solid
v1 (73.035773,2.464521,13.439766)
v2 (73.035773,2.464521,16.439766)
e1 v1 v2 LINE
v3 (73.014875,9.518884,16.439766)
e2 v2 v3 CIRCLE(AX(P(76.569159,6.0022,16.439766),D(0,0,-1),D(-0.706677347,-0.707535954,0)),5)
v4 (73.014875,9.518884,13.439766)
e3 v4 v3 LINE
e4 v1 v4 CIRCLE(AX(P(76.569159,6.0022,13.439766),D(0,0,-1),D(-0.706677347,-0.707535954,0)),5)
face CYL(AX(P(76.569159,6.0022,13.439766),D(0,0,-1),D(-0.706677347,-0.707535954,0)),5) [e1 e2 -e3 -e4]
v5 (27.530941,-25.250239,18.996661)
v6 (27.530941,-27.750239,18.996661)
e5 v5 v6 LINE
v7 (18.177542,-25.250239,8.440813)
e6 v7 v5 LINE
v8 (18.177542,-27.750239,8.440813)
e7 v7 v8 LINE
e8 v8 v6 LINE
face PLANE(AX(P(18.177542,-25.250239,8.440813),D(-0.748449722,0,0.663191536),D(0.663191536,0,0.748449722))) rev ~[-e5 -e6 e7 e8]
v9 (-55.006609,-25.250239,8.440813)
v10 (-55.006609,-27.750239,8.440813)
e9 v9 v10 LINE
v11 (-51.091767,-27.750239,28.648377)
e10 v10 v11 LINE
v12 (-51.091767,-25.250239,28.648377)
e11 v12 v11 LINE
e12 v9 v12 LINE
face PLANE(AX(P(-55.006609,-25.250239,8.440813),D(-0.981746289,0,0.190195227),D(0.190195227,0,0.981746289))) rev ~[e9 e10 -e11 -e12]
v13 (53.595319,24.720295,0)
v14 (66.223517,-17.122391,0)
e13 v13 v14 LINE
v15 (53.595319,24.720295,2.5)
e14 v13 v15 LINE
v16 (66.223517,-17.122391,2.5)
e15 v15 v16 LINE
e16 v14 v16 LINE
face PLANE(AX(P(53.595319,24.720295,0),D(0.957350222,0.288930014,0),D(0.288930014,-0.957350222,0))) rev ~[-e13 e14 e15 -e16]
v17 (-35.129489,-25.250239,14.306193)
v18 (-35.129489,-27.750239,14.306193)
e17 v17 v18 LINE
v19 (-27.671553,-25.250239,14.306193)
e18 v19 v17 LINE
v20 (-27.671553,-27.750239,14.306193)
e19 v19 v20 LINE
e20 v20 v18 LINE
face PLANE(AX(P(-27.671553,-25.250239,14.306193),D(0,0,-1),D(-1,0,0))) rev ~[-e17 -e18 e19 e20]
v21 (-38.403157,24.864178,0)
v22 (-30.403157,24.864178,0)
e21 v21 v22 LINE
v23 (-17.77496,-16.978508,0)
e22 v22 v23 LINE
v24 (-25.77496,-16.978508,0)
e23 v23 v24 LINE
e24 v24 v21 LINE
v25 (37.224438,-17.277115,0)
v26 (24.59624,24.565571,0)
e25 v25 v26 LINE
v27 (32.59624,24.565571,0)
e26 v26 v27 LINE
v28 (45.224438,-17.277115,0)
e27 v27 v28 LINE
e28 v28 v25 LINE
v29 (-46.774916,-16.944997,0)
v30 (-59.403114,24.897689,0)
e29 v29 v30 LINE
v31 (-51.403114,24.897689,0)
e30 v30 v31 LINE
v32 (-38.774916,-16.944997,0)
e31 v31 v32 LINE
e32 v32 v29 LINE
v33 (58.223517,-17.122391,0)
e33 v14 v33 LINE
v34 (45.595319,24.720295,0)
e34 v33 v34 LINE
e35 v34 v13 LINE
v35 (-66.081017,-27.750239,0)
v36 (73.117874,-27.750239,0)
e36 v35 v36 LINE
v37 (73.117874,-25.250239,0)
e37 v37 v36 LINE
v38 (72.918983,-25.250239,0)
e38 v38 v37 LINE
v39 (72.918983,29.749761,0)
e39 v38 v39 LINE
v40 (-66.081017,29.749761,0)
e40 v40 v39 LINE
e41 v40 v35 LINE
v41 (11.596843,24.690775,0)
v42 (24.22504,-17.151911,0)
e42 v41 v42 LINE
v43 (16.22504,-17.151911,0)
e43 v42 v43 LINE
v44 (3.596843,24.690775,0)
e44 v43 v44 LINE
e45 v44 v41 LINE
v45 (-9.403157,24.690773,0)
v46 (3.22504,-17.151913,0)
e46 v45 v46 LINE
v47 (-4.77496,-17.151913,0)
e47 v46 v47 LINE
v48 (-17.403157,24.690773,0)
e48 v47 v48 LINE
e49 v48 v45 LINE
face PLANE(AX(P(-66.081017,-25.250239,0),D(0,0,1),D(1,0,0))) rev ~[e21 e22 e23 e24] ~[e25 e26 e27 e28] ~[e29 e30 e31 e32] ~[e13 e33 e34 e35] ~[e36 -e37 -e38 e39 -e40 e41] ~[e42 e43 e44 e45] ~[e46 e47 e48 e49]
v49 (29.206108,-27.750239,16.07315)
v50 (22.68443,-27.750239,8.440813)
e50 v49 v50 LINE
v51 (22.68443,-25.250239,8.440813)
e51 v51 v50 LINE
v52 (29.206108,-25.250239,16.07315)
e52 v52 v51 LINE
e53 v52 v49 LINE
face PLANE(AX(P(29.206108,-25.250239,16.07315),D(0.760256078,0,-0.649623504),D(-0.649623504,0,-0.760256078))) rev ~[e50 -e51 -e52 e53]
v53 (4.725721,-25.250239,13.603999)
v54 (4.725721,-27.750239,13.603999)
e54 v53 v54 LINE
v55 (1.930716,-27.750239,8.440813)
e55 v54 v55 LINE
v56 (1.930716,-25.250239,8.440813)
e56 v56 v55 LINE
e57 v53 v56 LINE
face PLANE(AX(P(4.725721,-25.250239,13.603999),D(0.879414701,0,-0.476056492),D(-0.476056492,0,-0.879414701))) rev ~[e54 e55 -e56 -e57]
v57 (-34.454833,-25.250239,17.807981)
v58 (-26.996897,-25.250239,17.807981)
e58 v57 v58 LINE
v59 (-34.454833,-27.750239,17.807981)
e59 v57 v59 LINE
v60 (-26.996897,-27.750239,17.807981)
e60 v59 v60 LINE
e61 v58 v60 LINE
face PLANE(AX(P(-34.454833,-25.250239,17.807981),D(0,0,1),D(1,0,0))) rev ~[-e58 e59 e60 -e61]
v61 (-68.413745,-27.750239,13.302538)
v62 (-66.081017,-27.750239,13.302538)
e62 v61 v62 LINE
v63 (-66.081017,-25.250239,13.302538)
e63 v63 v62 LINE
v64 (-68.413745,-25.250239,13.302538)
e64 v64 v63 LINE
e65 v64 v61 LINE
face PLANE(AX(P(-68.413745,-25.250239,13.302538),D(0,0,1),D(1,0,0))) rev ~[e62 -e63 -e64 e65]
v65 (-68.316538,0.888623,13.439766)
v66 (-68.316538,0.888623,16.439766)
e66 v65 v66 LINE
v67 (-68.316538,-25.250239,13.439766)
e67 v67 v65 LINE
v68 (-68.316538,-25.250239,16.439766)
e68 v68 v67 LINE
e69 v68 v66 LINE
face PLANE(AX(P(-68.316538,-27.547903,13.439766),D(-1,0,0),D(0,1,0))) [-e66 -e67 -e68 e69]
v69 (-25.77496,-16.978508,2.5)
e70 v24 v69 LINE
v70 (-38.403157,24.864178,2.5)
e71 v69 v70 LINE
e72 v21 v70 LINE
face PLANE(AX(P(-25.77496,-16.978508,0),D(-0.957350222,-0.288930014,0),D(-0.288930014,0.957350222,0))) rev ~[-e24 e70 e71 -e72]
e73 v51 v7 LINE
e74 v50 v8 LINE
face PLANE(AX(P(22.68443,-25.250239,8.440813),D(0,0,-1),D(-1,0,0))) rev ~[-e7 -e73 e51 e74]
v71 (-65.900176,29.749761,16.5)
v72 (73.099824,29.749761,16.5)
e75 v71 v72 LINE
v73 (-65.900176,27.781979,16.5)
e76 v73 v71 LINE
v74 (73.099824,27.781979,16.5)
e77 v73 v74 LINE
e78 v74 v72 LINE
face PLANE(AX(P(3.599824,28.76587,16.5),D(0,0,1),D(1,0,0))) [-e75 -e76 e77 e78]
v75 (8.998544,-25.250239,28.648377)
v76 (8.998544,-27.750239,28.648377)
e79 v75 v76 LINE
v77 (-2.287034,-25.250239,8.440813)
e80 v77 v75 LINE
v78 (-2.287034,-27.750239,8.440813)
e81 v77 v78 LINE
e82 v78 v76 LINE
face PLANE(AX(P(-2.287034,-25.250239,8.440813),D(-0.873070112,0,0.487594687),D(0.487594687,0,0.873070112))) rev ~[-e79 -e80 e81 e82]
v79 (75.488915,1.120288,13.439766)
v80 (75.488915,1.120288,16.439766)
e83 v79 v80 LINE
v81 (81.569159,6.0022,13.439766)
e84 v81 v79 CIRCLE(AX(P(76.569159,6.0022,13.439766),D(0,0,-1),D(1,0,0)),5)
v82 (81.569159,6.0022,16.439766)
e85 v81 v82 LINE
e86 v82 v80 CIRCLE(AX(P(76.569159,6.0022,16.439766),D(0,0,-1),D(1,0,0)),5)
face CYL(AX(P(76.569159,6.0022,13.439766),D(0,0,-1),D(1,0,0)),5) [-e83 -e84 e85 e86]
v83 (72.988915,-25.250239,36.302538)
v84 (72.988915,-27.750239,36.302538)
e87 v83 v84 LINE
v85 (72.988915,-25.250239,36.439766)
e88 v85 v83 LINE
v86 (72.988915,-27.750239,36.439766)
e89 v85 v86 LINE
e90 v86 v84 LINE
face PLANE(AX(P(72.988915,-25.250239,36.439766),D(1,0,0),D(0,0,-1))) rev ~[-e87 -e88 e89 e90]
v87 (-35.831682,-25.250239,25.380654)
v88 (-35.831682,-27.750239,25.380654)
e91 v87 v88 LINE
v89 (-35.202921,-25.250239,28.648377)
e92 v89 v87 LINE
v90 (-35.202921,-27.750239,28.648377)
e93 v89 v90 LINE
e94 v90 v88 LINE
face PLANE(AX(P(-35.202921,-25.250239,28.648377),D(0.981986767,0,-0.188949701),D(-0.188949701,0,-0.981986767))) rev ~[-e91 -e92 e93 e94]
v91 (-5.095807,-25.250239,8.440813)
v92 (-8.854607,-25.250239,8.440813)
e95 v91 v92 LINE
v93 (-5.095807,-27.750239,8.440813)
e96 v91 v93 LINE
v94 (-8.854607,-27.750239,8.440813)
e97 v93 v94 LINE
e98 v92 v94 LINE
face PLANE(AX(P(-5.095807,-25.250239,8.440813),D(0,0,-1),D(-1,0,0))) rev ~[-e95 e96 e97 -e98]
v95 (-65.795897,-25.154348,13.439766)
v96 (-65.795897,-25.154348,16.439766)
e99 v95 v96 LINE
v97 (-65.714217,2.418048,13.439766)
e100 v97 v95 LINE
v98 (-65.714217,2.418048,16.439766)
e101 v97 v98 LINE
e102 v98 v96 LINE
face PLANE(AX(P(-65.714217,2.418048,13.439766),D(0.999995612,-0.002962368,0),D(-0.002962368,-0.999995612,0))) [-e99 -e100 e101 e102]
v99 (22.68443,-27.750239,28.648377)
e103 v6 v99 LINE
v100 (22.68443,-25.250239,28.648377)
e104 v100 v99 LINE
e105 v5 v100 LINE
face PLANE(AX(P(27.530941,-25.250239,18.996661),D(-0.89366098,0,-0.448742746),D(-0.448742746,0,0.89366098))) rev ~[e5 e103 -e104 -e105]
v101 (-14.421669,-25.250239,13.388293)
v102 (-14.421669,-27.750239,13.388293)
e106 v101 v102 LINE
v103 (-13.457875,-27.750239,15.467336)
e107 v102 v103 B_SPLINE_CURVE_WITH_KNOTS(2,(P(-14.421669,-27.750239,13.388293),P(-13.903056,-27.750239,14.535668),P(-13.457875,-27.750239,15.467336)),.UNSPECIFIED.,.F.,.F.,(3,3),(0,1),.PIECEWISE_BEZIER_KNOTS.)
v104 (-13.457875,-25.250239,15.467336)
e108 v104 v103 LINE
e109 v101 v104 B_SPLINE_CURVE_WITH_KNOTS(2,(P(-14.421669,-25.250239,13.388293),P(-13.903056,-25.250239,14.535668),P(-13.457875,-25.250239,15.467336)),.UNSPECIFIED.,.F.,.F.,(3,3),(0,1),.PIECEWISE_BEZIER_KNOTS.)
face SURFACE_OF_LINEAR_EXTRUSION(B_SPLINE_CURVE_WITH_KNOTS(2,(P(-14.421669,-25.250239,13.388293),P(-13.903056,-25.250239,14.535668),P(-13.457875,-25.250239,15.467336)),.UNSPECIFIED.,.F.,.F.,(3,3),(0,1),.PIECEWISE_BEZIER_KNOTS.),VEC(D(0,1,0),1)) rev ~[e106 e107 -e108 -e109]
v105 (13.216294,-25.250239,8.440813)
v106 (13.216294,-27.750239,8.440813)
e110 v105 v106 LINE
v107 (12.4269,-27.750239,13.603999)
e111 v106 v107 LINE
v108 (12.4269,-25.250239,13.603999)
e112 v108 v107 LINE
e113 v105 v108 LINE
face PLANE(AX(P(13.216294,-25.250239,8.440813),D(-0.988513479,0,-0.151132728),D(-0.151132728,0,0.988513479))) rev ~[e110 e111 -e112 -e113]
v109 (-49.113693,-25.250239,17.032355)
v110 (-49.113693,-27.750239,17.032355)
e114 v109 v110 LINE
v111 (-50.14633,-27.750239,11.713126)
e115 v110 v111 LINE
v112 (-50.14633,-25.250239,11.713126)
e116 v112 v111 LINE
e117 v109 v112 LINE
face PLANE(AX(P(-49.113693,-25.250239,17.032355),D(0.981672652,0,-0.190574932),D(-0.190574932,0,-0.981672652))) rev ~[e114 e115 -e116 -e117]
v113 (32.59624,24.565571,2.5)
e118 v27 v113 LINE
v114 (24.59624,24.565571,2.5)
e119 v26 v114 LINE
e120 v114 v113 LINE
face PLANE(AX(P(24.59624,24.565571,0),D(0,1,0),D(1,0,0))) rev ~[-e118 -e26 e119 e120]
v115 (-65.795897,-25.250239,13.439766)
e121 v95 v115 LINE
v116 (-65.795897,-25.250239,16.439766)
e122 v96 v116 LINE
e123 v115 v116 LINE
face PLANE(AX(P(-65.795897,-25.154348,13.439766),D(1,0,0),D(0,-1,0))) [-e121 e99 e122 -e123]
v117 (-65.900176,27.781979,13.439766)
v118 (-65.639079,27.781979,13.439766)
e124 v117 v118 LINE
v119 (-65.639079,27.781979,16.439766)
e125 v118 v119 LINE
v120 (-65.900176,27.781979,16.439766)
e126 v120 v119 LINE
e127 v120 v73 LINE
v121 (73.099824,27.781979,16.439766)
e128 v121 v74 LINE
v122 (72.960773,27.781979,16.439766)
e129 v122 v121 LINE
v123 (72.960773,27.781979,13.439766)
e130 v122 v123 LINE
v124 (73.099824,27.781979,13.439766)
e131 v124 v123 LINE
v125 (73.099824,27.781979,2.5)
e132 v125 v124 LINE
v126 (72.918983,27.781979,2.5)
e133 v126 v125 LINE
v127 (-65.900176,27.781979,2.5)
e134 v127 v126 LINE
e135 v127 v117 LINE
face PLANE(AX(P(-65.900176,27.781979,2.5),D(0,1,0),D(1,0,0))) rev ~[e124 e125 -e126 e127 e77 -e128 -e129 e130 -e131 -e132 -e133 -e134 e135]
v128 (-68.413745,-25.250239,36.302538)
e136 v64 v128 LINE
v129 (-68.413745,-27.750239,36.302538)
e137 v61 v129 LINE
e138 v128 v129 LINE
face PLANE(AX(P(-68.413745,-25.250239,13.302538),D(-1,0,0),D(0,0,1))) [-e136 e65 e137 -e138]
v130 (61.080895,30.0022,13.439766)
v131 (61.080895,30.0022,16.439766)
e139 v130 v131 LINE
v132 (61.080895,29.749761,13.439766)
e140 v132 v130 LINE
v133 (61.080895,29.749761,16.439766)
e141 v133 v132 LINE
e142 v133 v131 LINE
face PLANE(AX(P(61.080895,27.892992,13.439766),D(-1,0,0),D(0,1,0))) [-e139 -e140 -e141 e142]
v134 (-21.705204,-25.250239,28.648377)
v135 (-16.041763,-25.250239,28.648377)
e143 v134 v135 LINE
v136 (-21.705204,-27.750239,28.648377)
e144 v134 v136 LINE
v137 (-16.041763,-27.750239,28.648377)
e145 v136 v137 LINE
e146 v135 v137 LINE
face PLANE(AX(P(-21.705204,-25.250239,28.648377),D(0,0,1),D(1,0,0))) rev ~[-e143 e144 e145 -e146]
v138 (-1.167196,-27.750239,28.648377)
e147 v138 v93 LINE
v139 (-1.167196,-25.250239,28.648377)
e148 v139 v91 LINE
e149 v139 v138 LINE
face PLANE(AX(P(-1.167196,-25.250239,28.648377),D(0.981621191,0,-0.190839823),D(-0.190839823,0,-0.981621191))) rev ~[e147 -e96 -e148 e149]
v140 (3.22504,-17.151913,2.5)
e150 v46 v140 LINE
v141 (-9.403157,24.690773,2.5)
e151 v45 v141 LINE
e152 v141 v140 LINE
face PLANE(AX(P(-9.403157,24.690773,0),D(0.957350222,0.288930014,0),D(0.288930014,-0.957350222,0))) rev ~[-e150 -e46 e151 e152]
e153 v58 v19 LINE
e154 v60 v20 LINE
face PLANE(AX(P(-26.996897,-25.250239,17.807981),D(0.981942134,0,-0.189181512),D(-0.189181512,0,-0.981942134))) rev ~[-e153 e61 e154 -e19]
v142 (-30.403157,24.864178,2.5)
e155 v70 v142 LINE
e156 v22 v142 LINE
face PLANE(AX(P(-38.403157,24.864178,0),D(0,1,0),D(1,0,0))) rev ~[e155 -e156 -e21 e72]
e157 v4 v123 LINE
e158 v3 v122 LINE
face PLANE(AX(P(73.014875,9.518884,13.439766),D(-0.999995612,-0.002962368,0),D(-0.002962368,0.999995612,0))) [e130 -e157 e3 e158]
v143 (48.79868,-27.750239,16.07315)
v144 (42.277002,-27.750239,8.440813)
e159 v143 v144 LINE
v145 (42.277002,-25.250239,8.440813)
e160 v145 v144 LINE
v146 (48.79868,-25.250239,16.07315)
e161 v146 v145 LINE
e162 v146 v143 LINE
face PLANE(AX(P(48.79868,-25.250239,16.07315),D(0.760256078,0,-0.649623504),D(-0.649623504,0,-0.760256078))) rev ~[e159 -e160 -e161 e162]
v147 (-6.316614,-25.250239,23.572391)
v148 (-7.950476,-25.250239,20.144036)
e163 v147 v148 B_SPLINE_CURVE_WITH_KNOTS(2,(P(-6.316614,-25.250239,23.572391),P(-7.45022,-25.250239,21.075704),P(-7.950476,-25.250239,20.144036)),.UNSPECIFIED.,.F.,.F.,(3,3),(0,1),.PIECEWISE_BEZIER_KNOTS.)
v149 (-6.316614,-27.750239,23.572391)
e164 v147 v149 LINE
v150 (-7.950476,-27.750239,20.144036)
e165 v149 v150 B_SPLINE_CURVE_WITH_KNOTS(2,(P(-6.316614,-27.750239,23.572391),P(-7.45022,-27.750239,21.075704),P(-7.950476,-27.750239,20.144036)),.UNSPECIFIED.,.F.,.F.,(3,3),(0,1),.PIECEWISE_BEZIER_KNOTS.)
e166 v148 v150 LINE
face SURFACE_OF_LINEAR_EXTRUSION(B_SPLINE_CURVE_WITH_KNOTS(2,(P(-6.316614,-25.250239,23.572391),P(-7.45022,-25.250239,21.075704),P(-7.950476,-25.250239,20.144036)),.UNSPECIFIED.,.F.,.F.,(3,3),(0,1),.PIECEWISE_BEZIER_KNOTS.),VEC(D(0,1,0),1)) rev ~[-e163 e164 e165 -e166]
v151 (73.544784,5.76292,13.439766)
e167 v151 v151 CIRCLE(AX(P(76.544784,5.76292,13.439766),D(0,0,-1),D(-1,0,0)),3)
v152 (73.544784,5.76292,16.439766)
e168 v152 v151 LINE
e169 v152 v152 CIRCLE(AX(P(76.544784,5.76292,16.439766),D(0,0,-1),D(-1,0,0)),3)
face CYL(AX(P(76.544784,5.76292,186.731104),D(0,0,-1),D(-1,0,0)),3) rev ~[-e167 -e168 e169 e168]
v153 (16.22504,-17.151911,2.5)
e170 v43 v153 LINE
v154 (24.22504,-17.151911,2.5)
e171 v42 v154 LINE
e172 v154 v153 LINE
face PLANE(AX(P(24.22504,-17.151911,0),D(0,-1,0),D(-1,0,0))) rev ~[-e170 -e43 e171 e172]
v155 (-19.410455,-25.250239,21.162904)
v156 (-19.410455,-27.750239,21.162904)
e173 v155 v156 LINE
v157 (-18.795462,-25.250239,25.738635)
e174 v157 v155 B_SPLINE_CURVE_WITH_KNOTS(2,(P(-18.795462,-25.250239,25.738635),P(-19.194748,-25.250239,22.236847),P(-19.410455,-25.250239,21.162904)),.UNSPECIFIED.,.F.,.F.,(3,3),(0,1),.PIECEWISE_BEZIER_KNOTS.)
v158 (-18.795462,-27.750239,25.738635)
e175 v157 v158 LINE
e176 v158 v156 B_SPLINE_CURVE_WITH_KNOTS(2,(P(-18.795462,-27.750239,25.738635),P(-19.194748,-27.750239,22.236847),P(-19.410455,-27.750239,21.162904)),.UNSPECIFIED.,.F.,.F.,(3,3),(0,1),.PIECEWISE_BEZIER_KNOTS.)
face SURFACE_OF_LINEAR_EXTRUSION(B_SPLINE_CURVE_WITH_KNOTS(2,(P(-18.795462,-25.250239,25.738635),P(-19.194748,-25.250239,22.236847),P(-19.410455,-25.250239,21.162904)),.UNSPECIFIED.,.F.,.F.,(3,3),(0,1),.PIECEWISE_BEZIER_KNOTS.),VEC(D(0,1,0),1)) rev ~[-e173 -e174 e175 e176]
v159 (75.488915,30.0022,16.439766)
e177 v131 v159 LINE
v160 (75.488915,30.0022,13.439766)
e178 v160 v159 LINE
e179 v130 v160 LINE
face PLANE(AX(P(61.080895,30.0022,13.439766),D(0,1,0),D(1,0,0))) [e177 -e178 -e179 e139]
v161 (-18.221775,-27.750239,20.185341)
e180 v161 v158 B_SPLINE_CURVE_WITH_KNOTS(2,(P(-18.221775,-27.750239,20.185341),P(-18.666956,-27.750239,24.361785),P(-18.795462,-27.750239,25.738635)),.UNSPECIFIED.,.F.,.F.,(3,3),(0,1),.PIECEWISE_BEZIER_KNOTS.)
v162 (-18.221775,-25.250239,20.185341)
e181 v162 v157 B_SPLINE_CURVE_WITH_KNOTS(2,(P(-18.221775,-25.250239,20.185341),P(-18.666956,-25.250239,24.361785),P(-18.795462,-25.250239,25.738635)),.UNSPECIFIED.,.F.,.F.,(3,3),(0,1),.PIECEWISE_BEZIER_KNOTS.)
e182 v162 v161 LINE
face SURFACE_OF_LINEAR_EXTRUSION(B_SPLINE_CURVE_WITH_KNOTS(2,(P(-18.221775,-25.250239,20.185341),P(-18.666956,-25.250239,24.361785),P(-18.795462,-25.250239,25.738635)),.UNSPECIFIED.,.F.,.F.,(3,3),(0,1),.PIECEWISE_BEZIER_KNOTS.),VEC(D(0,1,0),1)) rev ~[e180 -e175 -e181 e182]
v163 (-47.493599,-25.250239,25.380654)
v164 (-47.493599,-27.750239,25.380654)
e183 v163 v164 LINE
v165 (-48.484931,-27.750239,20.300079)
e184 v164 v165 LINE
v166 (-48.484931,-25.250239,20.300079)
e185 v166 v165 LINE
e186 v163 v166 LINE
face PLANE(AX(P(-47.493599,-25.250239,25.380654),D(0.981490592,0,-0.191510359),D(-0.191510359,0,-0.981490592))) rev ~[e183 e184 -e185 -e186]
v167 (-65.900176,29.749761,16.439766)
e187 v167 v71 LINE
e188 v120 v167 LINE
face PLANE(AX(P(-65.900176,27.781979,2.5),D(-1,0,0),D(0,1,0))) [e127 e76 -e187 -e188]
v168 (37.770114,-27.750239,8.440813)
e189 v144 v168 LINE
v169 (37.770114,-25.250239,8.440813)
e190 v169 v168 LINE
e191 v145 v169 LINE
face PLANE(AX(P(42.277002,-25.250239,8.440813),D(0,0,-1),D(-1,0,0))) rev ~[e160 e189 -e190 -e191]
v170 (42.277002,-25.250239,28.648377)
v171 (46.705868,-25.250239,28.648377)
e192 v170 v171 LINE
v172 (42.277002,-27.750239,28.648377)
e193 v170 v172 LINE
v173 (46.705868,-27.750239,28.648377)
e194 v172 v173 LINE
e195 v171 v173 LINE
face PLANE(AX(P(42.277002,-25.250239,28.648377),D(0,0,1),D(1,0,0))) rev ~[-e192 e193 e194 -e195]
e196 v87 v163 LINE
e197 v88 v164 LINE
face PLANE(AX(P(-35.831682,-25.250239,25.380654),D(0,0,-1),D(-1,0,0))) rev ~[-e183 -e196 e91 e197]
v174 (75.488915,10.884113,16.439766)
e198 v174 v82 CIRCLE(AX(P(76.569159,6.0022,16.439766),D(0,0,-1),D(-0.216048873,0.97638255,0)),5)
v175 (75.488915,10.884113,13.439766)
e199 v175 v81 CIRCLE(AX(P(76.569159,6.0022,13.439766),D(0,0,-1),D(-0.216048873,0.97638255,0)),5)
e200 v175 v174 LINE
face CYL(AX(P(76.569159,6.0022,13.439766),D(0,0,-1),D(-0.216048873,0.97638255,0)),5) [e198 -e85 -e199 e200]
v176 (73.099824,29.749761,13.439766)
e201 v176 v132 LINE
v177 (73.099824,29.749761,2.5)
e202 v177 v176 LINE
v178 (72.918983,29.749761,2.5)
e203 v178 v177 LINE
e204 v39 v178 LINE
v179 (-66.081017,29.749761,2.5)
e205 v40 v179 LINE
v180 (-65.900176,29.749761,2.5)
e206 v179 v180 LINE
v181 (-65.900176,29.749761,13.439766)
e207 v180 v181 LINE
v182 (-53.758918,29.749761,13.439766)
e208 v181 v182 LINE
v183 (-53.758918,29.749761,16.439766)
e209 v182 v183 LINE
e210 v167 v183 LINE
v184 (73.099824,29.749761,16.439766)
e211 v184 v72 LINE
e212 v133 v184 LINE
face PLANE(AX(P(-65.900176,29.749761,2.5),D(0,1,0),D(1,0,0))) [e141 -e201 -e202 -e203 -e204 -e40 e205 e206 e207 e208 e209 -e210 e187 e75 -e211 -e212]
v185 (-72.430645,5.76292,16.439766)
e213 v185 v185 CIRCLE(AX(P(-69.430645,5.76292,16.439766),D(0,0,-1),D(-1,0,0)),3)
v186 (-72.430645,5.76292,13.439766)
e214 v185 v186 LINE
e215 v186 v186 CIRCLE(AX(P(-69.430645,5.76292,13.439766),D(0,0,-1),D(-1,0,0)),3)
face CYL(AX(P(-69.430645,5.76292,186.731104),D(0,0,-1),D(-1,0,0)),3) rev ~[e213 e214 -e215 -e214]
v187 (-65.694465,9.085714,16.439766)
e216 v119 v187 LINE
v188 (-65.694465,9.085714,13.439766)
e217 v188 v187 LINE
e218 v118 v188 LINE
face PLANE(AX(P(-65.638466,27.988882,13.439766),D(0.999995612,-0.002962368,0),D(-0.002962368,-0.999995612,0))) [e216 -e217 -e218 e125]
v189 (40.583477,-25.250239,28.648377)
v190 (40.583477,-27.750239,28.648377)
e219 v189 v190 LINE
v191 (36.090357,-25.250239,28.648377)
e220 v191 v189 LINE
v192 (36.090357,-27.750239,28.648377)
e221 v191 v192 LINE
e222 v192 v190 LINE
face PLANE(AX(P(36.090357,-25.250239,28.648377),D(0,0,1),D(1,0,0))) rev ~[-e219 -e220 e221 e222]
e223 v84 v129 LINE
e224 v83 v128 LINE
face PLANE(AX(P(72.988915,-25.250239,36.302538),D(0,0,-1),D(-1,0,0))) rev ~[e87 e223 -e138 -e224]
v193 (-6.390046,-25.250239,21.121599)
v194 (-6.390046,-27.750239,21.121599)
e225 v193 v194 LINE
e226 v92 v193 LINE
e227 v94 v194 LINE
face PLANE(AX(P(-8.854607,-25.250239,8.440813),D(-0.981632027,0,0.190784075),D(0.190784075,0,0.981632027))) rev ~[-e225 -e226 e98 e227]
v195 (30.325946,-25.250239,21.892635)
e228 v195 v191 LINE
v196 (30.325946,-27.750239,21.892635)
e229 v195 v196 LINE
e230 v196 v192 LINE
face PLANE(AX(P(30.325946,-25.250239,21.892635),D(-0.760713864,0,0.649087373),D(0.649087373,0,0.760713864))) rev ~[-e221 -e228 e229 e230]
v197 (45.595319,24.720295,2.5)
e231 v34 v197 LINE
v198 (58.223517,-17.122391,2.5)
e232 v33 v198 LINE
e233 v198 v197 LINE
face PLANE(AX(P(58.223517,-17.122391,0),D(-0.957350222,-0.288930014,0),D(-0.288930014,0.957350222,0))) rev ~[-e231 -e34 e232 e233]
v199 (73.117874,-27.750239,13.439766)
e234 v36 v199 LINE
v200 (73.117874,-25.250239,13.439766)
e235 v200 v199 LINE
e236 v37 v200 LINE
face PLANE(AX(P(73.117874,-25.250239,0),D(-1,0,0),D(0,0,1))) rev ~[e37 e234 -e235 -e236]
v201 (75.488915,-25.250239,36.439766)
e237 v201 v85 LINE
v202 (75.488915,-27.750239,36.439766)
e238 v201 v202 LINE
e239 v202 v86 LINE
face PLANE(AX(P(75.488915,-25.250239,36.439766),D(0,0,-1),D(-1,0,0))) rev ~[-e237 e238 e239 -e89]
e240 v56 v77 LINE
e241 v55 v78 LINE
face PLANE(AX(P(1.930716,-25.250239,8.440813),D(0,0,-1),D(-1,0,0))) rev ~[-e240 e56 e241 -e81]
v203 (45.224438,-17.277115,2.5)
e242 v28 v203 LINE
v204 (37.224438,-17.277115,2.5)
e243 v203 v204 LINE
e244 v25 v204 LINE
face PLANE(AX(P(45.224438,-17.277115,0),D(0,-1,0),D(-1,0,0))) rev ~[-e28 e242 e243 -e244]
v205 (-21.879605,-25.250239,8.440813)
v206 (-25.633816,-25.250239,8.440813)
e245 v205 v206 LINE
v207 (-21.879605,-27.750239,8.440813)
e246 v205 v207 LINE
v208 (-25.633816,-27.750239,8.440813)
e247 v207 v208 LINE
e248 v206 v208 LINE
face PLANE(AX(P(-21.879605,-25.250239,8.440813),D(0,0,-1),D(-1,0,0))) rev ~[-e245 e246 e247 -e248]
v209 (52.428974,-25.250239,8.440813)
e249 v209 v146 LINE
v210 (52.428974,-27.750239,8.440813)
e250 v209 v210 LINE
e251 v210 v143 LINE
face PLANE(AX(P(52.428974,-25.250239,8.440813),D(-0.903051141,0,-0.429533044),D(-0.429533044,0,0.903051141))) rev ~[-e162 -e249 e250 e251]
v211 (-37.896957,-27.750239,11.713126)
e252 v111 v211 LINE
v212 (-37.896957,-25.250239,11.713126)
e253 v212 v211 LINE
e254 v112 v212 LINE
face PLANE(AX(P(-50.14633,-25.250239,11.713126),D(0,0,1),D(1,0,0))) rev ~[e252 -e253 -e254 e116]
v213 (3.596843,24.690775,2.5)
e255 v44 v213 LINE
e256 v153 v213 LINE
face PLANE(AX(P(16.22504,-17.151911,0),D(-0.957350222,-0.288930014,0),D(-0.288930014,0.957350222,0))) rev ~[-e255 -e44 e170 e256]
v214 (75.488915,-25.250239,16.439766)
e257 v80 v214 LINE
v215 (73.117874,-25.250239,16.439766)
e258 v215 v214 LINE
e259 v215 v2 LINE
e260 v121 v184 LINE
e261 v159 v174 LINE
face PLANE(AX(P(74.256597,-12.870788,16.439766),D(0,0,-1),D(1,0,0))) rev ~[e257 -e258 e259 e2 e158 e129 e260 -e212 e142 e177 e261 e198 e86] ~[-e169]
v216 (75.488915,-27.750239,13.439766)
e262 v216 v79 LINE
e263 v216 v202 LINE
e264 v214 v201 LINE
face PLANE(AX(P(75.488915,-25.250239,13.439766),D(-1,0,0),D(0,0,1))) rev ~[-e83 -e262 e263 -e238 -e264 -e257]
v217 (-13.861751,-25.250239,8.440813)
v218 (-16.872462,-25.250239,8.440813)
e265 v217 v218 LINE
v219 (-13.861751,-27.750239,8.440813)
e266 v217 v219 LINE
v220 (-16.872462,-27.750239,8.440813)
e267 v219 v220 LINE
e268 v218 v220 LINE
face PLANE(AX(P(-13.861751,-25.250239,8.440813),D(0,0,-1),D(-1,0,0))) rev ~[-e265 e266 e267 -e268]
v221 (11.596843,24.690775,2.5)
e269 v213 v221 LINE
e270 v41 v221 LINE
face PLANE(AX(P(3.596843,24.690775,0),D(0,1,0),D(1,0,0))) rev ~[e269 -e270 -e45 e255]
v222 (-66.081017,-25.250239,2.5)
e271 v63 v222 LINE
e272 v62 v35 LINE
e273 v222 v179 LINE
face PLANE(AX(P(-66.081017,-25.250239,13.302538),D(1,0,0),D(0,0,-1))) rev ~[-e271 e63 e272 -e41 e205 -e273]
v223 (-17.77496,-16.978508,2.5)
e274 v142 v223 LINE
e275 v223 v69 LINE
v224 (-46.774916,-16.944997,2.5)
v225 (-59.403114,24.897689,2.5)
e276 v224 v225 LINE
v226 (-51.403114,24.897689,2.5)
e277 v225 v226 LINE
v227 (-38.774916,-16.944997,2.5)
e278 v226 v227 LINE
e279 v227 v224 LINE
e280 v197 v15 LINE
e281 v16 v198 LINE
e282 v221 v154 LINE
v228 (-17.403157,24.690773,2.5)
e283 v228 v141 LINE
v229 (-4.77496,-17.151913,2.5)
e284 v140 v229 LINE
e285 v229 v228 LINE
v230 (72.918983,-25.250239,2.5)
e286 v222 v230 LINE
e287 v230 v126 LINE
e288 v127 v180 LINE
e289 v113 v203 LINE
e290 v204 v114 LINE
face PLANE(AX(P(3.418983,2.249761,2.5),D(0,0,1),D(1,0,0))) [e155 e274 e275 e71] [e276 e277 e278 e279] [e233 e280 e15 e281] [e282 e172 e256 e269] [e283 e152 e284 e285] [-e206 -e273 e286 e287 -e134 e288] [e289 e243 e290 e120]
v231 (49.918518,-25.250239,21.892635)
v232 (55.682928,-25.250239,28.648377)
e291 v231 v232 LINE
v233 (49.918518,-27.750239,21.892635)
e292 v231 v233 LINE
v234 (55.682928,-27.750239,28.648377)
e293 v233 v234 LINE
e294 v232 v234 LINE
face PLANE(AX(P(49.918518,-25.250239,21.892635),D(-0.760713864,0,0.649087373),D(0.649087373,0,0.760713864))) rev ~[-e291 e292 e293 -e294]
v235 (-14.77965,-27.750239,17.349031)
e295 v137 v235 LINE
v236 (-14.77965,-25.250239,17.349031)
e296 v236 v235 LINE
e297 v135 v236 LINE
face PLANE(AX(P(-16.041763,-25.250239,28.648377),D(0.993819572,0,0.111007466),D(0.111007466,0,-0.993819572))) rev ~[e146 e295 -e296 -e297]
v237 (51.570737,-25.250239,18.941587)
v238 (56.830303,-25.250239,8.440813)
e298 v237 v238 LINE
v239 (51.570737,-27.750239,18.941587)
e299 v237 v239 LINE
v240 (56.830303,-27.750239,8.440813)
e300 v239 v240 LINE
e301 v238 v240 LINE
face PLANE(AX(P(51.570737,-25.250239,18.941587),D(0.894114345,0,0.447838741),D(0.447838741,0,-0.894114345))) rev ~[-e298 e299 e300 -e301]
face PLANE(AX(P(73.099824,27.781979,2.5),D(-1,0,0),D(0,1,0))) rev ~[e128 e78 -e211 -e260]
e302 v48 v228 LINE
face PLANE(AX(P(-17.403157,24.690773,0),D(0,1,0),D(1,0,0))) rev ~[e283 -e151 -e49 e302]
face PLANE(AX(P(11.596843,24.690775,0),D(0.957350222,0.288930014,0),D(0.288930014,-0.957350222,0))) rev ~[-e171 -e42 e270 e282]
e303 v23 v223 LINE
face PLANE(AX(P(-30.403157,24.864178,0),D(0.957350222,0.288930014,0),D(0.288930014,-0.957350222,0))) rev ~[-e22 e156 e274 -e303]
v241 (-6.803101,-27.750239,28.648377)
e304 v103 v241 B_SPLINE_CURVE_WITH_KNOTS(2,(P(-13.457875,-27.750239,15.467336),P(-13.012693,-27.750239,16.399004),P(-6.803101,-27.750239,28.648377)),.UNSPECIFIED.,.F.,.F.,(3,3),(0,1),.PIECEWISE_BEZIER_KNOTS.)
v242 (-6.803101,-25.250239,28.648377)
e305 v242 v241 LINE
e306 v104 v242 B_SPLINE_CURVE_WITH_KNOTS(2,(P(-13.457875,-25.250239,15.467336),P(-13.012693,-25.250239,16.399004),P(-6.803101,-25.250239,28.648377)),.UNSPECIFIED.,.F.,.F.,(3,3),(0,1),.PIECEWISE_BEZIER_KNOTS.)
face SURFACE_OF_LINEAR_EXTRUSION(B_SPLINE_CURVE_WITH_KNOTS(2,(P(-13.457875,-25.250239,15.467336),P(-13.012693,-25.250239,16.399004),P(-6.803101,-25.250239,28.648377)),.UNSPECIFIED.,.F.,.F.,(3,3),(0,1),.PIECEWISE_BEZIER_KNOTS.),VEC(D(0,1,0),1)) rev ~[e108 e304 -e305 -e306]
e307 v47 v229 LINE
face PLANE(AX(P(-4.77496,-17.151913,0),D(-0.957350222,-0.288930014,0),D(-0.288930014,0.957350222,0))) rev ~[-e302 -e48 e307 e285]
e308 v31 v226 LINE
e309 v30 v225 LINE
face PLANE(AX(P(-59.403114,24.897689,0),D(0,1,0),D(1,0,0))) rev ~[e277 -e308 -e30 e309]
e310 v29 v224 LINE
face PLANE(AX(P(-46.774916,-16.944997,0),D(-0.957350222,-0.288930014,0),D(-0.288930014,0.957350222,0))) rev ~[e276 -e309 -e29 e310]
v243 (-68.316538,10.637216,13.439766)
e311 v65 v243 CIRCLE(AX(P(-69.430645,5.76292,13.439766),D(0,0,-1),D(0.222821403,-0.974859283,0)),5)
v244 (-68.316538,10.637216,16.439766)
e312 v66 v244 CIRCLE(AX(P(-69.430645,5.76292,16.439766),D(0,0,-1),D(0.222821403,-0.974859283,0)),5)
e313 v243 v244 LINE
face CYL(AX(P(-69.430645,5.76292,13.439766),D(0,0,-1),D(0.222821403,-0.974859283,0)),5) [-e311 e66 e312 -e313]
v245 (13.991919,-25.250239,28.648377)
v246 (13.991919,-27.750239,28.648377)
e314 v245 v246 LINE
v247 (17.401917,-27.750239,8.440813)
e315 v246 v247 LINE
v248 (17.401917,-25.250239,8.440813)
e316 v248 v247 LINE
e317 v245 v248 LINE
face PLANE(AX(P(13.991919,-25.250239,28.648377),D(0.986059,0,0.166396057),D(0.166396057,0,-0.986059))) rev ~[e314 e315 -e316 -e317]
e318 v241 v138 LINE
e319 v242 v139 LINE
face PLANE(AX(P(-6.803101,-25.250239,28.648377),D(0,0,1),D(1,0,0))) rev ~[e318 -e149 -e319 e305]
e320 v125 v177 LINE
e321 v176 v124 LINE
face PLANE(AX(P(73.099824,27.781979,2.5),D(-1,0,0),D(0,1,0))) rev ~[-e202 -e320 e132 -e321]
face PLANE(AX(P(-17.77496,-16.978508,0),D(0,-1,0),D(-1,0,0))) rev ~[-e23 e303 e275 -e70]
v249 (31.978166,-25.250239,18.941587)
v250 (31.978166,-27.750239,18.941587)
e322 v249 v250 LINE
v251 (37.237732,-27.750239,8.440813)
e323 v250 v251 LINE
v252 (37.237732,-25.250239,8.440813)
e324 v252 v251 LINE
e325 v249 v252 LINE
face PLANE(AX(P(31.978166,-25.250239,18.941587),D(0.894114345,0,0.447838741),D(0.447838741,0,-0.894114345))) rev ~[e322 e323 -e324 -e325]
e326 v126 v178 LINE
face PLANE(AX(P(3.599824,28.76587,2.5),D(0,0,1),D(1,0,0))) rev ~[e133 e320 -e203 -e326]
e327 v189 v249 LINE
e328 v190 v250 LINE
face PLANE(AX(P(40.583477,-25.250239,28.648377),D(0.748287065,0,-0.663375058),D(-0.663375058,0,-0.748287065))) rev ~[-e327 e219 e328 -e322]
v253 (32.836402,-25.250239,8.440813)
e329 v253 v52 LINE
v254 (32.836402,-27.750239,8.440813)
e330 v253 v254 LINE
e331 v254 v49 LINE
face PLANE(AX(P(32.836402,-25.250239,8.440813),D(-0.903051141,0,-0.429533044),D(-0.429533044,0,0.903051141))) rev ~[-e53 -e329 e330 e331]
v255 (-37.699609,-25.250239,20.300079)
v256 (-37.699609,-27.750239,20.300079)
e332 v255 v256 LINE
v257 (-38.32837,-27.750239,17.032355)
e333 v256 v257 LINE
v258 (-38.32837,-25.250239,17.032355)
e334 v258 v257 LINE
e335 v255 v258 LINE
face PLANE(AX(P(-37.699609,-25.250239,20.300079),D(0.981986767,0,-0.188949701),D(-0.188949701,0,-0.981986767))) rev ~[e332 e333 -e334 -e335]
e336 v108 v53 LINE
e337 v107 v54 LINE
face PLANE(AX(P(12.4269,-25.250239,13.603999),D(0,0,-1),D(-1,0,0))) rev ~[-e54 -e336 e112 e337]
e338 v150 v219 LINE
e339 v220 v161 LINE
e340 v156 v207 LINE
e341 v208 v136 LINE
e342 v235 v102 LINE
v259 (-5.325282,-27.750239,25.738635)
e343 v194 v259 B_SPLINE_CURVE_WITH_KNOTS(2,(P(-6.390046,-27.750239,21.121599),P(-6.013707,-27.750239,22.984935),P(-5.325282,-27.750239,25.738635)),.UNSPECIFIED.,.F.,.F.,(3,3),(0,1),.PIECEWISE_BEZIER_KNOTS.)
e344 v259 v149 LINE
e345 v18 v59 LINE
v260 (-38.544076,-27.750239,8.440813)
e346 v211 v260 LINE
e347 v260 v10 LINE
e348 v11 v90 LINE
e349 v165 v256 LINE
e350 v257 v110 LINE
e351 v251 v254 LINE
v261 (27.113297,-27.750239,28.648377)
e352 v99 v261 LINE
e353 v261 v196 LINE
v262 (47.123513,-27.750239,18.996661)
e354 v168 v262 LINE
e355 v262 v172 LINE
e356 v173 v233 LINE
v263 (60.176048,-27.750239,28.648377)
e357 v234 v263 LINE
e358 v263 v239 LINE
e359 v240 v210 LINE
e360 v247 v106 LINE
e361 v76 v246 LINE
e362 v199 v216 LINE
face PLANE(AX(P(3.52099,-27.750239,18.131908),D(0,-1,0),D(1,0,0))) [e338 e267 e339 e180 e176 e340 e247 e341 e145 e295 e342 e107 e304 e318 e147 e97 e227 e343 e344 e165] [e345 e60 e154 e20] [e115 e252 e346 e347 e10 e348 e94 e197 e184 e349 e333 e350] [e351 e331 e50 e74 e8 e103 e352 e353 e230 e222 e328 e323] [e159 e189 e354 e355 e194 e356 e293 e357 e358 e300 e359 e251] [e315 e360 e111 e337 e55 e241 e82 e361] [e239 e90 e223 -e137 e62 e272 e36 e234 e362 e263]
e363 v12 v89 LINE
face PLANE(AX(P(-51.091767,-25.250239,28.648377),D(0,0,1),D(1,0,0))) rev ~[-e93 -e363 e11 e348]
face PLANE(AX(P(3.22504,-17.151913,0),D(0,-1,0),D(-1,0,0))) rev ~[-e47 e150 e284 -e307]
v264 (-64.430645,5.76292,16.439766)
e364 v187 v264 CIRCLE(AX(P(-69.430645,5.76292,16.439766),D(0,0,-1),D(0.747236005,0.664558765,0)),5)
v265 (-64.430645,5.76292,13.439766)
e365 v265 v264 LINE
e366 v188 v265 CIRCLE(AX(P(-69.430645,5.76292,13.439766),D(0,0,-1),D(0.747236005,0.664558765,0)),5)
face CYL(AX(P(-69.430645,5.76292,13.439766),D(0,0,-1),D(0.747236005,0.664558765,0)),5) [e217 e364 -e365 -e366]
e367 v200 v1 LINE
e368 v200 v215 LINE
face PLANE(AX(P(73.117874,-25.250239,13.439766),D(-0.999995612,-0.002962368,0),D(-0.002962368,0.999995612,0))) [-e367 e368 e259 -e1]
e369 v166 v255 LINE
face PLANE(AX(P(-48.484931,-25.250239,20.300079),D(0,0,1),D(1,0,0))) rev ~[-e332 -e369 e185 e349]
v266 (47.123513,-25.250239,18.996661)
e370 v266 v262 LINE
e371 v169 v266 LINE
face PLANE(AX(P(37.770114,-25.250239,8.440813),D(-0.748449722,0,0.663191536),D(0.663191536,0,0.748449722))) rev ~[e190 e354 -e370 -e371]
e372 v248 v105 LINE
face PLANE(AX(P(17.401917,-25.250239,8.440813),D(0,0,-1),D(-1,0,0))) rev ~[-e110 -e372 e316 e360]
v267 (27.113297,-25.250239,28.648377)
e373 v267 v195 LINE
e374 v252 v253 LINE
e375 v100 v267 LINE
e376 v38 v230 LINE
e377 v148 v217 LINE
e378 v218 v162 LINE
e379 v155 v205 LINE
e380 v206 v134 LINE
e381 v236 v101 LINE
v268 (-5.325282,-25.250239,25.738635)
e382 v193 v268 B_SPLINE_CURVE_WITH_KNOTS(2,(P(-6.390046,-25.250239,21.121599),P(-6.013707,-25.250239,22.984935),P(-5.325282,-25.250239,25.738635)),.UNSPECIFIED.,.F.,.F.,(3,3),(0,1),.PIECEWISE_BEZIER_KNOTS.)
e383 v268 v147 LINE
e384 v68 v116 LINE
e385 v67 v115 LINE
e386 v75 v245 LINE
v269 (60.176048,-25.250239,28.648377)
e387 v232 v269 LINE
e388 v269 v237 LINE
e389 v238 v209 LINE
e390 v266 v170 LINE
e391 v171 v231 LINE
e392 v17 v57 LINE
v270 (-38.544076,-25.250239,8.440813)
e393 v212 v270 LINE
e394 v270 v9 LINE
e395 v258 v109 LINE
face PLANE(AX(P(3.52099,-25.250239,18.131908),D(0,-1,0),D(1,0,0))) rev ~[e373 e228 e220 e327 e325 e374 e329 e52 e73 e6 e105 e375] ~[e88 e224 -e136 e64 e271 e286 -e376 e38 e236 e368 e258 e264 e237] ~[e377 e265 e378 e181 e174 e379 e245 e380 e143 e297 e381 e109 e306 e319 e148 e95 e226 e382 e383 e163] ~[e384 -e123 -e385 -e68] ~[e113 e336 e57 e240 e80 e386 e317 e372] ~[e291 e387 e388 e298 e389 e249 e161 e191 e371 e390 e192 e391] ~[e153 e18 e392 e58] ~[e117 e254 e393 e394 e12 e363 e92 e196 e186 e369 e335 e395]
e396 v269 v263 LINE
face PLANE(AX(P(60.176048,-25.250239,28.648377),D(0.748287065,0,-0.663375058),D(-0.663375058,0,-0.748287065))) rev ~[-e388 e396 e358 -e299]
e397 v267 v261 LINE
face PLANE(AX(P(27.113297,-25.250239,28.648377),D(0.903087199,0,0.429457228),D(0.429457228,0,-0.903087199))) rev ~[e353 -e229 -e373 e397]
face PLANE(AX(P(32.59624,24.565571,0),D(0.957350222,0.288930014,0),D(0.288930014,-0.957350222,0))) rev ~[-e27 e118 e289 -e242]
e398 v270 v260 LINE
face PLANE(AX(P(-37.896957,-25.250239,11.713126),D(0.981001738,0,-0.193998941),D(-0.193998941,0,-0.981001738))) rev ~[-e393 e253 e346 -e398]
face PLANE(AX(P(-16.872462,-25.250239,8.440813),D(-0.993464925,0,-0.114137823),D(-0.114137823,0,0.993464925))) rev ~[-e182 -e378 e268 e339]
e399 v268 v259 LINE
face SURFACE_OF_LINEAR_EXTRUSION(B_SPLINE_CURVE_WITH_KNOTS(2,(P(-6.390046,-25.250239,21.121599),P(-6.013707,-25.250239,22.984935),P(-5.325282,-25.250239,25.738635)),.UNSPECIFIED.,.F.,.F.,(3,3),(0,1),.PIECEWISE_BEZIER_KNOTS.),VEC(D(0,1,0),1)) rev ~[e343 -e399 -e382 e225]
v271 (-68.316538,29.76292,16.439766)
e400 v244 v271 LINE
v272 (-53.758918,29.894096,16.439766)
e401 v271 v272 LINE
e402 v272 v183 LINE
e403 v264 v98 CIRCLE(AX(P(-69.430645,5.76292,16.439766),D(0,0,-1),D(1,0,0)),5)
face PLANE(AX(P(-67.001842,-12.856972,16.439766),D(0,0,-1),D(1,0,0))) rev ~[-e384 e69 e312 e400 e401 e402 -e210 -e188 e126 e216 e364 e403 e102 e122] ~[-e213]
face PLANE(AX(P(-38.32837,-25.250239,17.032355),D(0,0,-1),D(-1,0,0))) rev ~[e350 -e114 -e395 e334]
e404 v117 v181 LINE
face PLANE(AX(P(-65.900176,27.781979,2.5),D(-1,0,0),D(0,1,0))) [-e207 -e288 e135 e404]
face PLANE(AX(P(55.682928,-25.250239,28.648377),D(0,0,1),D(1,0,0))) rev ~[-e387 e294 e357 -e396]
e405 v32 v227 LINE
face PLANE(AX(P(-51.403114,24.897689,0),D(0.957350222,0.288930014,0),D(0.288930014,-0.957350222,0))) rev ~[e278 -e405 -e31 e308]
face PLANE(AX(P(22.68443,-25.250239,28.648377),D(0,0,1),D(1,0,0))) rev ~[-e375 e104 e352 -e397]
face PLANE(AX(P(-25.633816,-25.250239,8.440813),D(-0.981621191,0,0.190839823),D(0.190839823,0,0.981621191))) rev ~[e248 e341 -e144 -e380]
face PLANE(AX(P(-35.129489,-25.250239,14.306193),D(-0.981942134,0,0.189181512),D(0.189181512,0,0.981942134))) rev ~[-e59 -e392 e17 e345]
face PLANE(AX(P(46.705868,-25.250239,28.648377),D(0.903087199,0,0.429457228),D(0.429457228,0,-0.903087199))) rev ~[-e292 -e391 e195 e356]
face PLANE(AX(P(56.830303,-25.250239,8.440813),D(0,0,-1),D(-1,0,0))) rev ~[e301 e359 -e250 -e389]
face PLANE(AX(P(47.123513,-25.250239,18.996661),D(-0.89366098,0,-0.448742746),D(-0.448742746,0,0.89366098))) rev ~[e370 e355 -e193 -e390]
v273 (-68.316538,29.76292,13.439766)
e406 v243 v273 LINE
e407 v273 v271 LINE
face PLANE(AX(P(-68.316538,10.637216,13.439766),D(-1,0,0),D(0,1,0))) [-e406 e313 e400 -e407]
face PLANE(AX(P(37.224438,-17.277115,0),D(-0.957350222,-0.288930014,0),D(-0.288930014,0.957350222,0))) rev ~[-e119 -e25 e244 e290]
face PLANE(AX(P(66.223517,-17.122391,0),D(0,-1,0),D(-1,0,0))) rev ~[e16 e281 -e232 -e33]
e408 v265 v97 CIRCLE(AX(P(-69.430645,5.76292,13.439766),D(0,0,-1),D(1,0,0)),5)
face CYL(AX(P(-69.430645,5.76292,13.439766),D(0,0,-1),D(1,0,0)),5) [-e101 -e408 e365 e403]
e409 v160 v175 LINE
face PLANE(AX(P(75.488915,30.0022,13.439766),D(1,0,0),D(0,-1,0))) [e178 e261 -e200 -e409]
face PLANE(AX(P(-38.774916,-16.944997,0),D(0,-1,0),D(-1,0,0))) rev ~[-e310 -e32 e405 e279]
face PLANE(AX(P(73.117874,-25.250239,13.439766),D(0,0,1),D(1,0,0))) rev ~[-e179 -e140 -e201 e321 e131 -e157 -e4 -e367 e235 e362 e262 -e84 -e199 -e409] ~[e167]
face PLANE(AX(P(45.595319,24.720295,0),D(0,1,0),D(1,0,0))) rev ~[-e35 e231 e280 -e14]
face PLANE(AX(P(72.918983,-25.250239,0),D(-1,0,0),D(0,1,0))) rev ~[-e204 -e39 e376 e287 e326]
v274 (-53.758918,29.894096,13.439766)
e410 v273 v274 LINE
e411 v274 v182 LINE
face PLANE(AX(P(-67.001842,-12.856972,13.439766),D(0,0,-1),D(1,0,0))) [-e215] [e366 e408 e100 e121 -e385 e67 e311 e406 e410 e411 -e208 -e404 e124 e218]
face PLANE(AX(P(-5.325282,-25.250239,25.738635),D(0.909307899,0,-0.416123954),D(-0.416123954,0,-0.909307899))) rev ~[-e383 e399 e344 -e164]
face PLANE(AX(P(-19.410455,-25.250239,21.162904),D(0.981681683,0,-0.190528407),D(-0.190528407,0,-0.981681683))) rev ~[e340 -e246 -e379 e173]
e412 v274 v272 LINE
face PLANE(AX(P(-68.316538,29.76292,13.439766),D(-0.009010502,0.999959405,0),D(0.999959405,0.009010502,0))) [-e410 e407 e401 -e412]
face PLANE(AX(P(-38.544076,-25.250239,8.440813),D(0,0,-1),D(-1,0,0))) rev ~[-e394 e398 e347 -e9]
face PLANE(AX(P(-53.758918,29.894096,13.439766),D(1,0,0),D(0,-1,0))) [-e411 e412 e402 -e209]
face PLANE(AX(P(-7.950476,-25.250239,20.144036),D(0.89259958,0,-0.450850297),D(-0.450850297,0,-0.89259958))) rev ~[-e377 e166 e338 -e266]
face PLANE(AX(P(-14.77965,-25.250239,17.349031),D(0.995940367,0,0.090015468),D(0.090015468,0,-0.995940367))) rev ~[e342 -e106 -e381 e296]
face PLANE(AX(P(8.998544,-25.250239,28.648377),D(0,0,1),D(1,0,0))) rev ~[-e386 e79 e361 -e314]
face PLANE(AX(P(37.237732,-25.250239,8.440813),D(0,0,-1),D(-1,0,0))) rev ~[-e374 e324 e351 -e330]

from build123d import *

# Parameters (mm, degrees)
F0_W     = 139
F0_H     = 55
F1_DEPTH = 2.5
F2_W     = 2.3327280719
F2_H     = 23
F2_W_2   = 0.1672719281
F2_W_3   = 0.1289593171
F2_H_2   = 22.8627715209
F3_DEPTH = 2.5
F5_DEPTH = 3
F6_W     = 139
F6_H     = 1.9677817641
F7_DEPTH = 14
F9_D     = 6


with BuildPart() as f1:
    # F0 (on Top) → F1 (new body)
    with BuildSketch(Plane.XY):
        with Locations((3.418983344, 2.2497611304)):
            Rectangle(F0_W, F0_H)
        Polygon((-46.7749163508, -16.9449970126), (-59.4031140208, 24.8976889998), (-51.4031140208, 24.8976889998), (-38.7749163508, -16.9449970126), align=None, mode=Mode.SUBTRACT)
        Polygon((-25.7749595437, -16.9785083988), (-38.4031572137, 24.8641776135), (-30.4031572137, 24.8641776135), (-17.7749595437, -16.9785083988), align=None, mode=Mode.SUBTRACT)
        Polygon((-4.7749595437, -17.1519126743), (-17.4031572137, 24.6907733381), (-9.4031572137, 24.6907733381), (3.2250404563, -17.1519126743), align=None, mode=Mode.SUBTRACT)
        Polygon((16.2250404563, -17.1519108117), (3.5968427863, 24.6907752007), (11.5968427863, 24.6907752007), (24.2250404563, -17.1519108117), align=None, mode=Mode.SUBTRACT)
        Polygon((37.2244375112, -17.277115479), (24.5962398412, 24.5655705334), (32.5962398412, 24.5655705334), (45.2244375112, -17.277115479), align=None, mode=Mode.SUBTRACT)
        Polygon((58.2235167211, -17.1223909005), (45.5953190511, 24.7202951119), (53.5953190511, 24.7202951119), (66.2235167211, -17.1223909005), align=None, mode=Mode.SUBTRACT)
    extrude(amount=F1_DEPTH)

    # F2 (on face) → F3 (join)
    with BuildSketch(Plane.XZ.offset(25.2502388696)):
        Polygon((-66.081016656, 13.302537529), (-66.081016656, 0), (73.1178743134, 0), (73.1178743134, 13.4397660082), (72.9889149964, 13.4397660082), (72.9889149964, 36.302537529), (-65.9137447279, 36.302537529), (-65.9137447279, 13.302537529), align=None)
        Polygon((-27.6715531448, 14.3061928175), (-35.129489078, 14.3061928175), (-34.4548327198, 17.8079805818), (-26.9968967865, 17.8079805818), align=None, mode=Mode.SUBTRACT)
        Polygon((-38.5440763607, 8.4408130497), (-55.0066094022, 8.4408130497), (-51.0917667246, 28.6483773044), (-35.2029210626, 28.6483773044), (-35.8316824305, 25.3806539909), (-47.4935994805, 25.3806539909), (-48.4849312723, 20.3000785582), (-37.6996085381, 20.3000785582), (-38.328369906, 17.0323552447), (-49.1136926402, 17.0323552447), (-50.1463299232, 11.7131258622), (-37.8969569966, 11.7131258622), align=None, mode=Mode.SUBTRACT)
        with BuildLine():
            Line((-5.0958073876, 8.4408130497), (-8.8546070979, 8.4408130497))
            Line((-8.8546070979, 8.4408130497), (-6.3900461157, 21.1215988857))
            add(Edge.make_bspline(
                [(-6.3900461157, 21.1215988857), (-6.0137071947, 22.9849354942), (-5.3252823394, 25.7386349157)],
                knots=[0, 0, 0, 1, 1, 1], degree=2))
            Line((-5.3252823394, 25.7386349157), (-6.3166141311, 23.5723913708))
            add(Edge.make_bspline(
                [(-6.3166141311, 23.5723913708), (-7.450220393, 21.0757038953), (-7.9504757879, 20.144035591)],
                knots=[0, 0, 0, 1, 1, 1], degree=2))
            Line((-7.9504757879, 20.144035591), (-13.861750546, 8.4408130497))
            Line((-13.861750546, 8.4408130497), (-16.8724619135, 8.4408130497))
            Line((-16.8724619135, 8.4408130497), (-18.22177463, 20.1853410823))
            add(Edge.make_bspline(
                [(-18.22177463, 20.1853410823), (-18.6669560365, 24.3617852049), (-18.7954620095, 25.7386349157)],
                knots=[0, 0, 0, 1, 1, 1], degree=2))
            add(Edge.make_bspline(
                [(-18.7954620095, 25.7386349157), (-19.1947484256, 22.2368471514), (-19.4104548803, 21.162904377)],
                knots=[0, 0, 0, 1, 1, 1], degree=2))
            Line((-19.4104548803, 21.162904377), (-21.8796053616, 8.4408130497))
            Line((-21.8796053616, 8.4408130497), (-25.6338155729, 8.4408130497))
            Line((-25.6338155729, 8.4408130497), (-21.7052043982, 28.6483773044))
            Line((-21.7052043982, 28.6483773044), (-16.041762588, 28.6483773044))
            Line((-16.041762588, 28.6483773044), (-14.7796503532, 17.3490306782))
            Line((-14.7796503532, 17.3490306782), (-14.4216694284, 13.3882930103))
            add(Edge.make_bspline(
                [(-14.4216694284, 13.3882930103), (-13.9030560373, 14.5356677692), (-13.4578746309, 15.4673360735)],
                knots=[0, 0, 0, 1, 1, 1], degree=2))
            add(Edge.make_bspline(
                [(-13.4578746309, 15.4673360735), (-13.0126932244, 16.3990043778), (-6.8031010289, 28.6483773044)],
                knots=[0, 0, 0, 1, 1, 1], degree=2))
            Line((-6.8031010289, 28.6483773044), (-1.1671962129, 28.6483773044))
            Line((-1.1671962129, 28.6483773044), (-5.0958073876, 8.4408130497))
        make_face(mode=Mode.SUBTRACT)
        Polygon((17.401916886, 8.4408130497), (13.2162937654, 8.4408130497), (12.4268999312, 13.603999465), (4.7257205491, 13.603999465), (1.9307156363, 8.4408130497), (-2.2870339777, 8.4408130497), (8.9985441514, 28.6483773044), (13.9919191024, 28.6483773044), align=None, mode=Mode.SUBTRACT)
        Polygon((27.5309412581, 18.9966608321), (22.6844302763, 28.6483773044), (27.1132968458, 28.6483773044), (30.3259461709, 21.8926347237), (36.0903569599, 28.6483773044), (40.583476516, 28.6483773044), (31.9781658238, 18.9415868436), (37.2377317189, 8.4408130497), (32.8364021435, 8.4408130497), (29.2061084062, 16.0731499462), (22.6844302763, 8.4408130497), (18.1775422231, 8.4408130497), align=None, mode=Mode.SUBTRACT)
        Polygon((47.123512642, 18.9966608321), (42.2770016602, 28.6483773044), (46.7058682298, 28.6483773044), (49.9185175548, 21.8926347237), (55.6829283438, 28.6483773044), (60.1760478999, 28.6483773044), (51.5707372077, 18.9415868436), (56.8303031028, 8.4408130497), (52.4289735274, 8.4408130497), (48.7986797901, 16.0731499462), (42.2770016602, 8.4408130497), (37.770113607, 8.4408130497), align=None, mode=Mode.SUBTRACT)
        with Locations((-67.247380692, 24.802537529)):
            Rectangle(F2_W, F2_H)
        with Locations((-65.997380692, 24.802537529)):
            Rectangle(F2_W_2, F2_H)
        with Locations((73.0533946549, 24.8711517686)):
            Rectangle(F2_W_3, F2_H_2)
        Polygon((73.1178743134, 36.302537529), (73.1178743134, 13.4397660082), (75.4889149964, 13.4397660082), (75.4889149964, 36.4397660082), (72.9889149964, 36.4397660082), (72.9889149964, 36.302537529), align=None)
    extrude(amount=F3_DEPTH)

    # F4 (on face) → F5 (join)
    with BuildSketch(Plane(origin=(0, 0, 13.4397660082), x_dir=(1, 0, 0), z_dir=(0, 0, -1))):
        with BuildLine():
            Line((75.4889149964, 25.2502388696), (75.4889149964, 27.7502388696))
            Line((75.4889149964, 27.7502388696), (73.1178743134, 27.7502388696))
            Line((73.1178743134, 27.7502388696), (73.1178743134, 25.2502388696))
            Line((73.1178743134, 25.2502388696), (73.0357726252, -2.464520624))
            ThreePointArc((73.0357726252, -2.464520624), (74.1664237205, -1.6173558789), (75.4889149964, -1.1202876444))
            Line((75.4889149964, -1.1202876444), (75.4889149964, 25.2502388696))
        make_face()
        with BuildLine():
            ThreePointArc((81.5691593623, -6.0022003956), (79.6995569545, -2.1034043102), (75.4889149964, -1.1202876444))
            Line((75.4889149964, -1.1202876444), (75.4889149964, -10.8841131467))
            ThreePointArc((75.4889149964, -10.8841131467), (79.6995569545, -9.9009964809), (81.5691593623, -6.0022003956))
        make_face()
        with BuildLine():
            Line((75.4889149964, -10.8841131467), (75.4889149964, -1.1202876444))
            ThreePointArc((75.4889149964, -1.1202876444), (74.1664237205, -1.6173558789), (73.0357726252, -2.464520624))
            Line((73.0357726252, -2.464520624), (73.014874911, -9.5188837818))
            ThreePointArc((73.014874911, -9.5188837818), (74.1534447384, -10.3799078842), (75.4889149964, -10.8841131467))
        make_face()
        with BuildLine():
            Line((75.4889149964, -30.0022003956), (75.4889149964, -10.8841131467))
            ThreePointArc((75.4889149964, -10.8841131467), (74.1534447384, -10.3799078842), (73.014874911, -9.5188837818))
            Line((73.014874911, -9.5188837818), (72.9604437947, -27.8929919004))
            Line((72.9604437947, -27.8929919004), (61.0808953643, -27.8929919004))
            Line((61.0808953643, -27.8929919004), (61.0808953643, -30.0022003956))
            Line((61.0808953643, -30.0022003956), (75.4889149964, -30.0022003956))
        make_face()
        with BuildLine():
            Line((73.014874911, -9.5188837818), (73.0357726252, -2.464520624))
            ThreePointArc((73.0357726252, -2.464520624), (71.5691813014, -5.9873885535), (73.014874911, -9.5188837818))
        make_face()
        with BuildLine():
            Line((-68.1669373373, 27.6543483512), (-68.3165375451, 27.5479025488))
            Line((-68.3165375451, 27.5479025488), (-68.3165375451, -0.8886232584))
            ThreePointArc((-68.3165375451, -0.8886232584), (-66.8972077442, -1.452270315), (-65.714216699, -2.4180483823))
            Line((-65.714216699, -2.4180483823), (-65.7958966544, 25.1543483512))
            Line((-65.7958966544, 25.1543483512), (-65.7958966544, 27.6543483512))
            Line((-65.7958966544, 27.6543483512), (-68.1669373373, 27.6543483512))
        make_face()
        with BuildLine():
            ThreePointArc((-65.714216699, -2.4180483823), (-66.8972077442, -1.452270315), (-68.3165375451, -0.8886232584))
            Line((-68.3165375451, -0.8886232584), (-68.3165375451, -10.637216093))
            ThreePointArc((-68.3165375451, -10.637216093), (-66.884449129, -10.0660451489), (-65.6944645318, -9.0857135021))
            Line((-65.6944645318, -9.0857135021), (-65.714216699, -2.4180483823))
        make_face()
        with BuildLine():
            Line((-68.3165375451, -10.637216093), (-68.3165375451, -0.8886232584))
            ThreePointArc((-68.3165375451, -0.8886232584), (-74.4306445579, -5.7629196757), (-68.3165375451, -10.637216093))
        make_face()
        with BuildLine():
            ThreePointArc((-65.6944645318, -9.0857135021), (-66.884449129, -10.0660451489), (-68.3165375451, -10.637216093))
            Line((-68.3165375451, -10.637216093), (-68.3165375451, -29.7629196757))
            Line((-68.3165375451, -29.7629196757), (-53.7589177052, -29.8940964603))
            Line((-53.7589177052, -29.8940964603), (-53.7589177052, -27.9888824189))
            Line((-53.7589177052, -27.9888824189), (-61.1505493085, -27.9888824189))
            Line((-61.1505493085, -27.9888824189), (-65.6384661357, -27.9888824189))
            Line((-65.6384661357, -27.9888824189), (-65.6944645318, -9.0857135021))
        make_face()
        with BuildLine():
            ThreePointArc((-64.4306445579, -5.7629196757), (-64.7625539796, -3.9715709233), (-65.714216699, -2.4180483823))
            Line((-65.714216699, -2.4180483823), (-65.6944645318, -9.0857135021))
            ThreePointArc((-65.6944645318, -9.0857135021), (-64.7572678274, -7.5404319639), (-64.4306445579, -5.7629196757))
        make_face()
    extrude(amount=-F5_DEPTH)

    # F6 (on face) → F7 (join)
    with BuildSketch(Plane.XY.offset(2.5)):
        with Locations((3.5998241897, 28.7658702483)):
            Rectangle(F6_W, F6_H)
    extrude(amount=F7_DEPTH)

    # F9 (through all)
    with Locations(Plane.XY.offset(16.4397660082)):
        with Locations((-69.4306445579, 5.7629196757), (76.5447840095, 5.7629196757)):
            Hole(F9_D / 2)


solid = f1.part
